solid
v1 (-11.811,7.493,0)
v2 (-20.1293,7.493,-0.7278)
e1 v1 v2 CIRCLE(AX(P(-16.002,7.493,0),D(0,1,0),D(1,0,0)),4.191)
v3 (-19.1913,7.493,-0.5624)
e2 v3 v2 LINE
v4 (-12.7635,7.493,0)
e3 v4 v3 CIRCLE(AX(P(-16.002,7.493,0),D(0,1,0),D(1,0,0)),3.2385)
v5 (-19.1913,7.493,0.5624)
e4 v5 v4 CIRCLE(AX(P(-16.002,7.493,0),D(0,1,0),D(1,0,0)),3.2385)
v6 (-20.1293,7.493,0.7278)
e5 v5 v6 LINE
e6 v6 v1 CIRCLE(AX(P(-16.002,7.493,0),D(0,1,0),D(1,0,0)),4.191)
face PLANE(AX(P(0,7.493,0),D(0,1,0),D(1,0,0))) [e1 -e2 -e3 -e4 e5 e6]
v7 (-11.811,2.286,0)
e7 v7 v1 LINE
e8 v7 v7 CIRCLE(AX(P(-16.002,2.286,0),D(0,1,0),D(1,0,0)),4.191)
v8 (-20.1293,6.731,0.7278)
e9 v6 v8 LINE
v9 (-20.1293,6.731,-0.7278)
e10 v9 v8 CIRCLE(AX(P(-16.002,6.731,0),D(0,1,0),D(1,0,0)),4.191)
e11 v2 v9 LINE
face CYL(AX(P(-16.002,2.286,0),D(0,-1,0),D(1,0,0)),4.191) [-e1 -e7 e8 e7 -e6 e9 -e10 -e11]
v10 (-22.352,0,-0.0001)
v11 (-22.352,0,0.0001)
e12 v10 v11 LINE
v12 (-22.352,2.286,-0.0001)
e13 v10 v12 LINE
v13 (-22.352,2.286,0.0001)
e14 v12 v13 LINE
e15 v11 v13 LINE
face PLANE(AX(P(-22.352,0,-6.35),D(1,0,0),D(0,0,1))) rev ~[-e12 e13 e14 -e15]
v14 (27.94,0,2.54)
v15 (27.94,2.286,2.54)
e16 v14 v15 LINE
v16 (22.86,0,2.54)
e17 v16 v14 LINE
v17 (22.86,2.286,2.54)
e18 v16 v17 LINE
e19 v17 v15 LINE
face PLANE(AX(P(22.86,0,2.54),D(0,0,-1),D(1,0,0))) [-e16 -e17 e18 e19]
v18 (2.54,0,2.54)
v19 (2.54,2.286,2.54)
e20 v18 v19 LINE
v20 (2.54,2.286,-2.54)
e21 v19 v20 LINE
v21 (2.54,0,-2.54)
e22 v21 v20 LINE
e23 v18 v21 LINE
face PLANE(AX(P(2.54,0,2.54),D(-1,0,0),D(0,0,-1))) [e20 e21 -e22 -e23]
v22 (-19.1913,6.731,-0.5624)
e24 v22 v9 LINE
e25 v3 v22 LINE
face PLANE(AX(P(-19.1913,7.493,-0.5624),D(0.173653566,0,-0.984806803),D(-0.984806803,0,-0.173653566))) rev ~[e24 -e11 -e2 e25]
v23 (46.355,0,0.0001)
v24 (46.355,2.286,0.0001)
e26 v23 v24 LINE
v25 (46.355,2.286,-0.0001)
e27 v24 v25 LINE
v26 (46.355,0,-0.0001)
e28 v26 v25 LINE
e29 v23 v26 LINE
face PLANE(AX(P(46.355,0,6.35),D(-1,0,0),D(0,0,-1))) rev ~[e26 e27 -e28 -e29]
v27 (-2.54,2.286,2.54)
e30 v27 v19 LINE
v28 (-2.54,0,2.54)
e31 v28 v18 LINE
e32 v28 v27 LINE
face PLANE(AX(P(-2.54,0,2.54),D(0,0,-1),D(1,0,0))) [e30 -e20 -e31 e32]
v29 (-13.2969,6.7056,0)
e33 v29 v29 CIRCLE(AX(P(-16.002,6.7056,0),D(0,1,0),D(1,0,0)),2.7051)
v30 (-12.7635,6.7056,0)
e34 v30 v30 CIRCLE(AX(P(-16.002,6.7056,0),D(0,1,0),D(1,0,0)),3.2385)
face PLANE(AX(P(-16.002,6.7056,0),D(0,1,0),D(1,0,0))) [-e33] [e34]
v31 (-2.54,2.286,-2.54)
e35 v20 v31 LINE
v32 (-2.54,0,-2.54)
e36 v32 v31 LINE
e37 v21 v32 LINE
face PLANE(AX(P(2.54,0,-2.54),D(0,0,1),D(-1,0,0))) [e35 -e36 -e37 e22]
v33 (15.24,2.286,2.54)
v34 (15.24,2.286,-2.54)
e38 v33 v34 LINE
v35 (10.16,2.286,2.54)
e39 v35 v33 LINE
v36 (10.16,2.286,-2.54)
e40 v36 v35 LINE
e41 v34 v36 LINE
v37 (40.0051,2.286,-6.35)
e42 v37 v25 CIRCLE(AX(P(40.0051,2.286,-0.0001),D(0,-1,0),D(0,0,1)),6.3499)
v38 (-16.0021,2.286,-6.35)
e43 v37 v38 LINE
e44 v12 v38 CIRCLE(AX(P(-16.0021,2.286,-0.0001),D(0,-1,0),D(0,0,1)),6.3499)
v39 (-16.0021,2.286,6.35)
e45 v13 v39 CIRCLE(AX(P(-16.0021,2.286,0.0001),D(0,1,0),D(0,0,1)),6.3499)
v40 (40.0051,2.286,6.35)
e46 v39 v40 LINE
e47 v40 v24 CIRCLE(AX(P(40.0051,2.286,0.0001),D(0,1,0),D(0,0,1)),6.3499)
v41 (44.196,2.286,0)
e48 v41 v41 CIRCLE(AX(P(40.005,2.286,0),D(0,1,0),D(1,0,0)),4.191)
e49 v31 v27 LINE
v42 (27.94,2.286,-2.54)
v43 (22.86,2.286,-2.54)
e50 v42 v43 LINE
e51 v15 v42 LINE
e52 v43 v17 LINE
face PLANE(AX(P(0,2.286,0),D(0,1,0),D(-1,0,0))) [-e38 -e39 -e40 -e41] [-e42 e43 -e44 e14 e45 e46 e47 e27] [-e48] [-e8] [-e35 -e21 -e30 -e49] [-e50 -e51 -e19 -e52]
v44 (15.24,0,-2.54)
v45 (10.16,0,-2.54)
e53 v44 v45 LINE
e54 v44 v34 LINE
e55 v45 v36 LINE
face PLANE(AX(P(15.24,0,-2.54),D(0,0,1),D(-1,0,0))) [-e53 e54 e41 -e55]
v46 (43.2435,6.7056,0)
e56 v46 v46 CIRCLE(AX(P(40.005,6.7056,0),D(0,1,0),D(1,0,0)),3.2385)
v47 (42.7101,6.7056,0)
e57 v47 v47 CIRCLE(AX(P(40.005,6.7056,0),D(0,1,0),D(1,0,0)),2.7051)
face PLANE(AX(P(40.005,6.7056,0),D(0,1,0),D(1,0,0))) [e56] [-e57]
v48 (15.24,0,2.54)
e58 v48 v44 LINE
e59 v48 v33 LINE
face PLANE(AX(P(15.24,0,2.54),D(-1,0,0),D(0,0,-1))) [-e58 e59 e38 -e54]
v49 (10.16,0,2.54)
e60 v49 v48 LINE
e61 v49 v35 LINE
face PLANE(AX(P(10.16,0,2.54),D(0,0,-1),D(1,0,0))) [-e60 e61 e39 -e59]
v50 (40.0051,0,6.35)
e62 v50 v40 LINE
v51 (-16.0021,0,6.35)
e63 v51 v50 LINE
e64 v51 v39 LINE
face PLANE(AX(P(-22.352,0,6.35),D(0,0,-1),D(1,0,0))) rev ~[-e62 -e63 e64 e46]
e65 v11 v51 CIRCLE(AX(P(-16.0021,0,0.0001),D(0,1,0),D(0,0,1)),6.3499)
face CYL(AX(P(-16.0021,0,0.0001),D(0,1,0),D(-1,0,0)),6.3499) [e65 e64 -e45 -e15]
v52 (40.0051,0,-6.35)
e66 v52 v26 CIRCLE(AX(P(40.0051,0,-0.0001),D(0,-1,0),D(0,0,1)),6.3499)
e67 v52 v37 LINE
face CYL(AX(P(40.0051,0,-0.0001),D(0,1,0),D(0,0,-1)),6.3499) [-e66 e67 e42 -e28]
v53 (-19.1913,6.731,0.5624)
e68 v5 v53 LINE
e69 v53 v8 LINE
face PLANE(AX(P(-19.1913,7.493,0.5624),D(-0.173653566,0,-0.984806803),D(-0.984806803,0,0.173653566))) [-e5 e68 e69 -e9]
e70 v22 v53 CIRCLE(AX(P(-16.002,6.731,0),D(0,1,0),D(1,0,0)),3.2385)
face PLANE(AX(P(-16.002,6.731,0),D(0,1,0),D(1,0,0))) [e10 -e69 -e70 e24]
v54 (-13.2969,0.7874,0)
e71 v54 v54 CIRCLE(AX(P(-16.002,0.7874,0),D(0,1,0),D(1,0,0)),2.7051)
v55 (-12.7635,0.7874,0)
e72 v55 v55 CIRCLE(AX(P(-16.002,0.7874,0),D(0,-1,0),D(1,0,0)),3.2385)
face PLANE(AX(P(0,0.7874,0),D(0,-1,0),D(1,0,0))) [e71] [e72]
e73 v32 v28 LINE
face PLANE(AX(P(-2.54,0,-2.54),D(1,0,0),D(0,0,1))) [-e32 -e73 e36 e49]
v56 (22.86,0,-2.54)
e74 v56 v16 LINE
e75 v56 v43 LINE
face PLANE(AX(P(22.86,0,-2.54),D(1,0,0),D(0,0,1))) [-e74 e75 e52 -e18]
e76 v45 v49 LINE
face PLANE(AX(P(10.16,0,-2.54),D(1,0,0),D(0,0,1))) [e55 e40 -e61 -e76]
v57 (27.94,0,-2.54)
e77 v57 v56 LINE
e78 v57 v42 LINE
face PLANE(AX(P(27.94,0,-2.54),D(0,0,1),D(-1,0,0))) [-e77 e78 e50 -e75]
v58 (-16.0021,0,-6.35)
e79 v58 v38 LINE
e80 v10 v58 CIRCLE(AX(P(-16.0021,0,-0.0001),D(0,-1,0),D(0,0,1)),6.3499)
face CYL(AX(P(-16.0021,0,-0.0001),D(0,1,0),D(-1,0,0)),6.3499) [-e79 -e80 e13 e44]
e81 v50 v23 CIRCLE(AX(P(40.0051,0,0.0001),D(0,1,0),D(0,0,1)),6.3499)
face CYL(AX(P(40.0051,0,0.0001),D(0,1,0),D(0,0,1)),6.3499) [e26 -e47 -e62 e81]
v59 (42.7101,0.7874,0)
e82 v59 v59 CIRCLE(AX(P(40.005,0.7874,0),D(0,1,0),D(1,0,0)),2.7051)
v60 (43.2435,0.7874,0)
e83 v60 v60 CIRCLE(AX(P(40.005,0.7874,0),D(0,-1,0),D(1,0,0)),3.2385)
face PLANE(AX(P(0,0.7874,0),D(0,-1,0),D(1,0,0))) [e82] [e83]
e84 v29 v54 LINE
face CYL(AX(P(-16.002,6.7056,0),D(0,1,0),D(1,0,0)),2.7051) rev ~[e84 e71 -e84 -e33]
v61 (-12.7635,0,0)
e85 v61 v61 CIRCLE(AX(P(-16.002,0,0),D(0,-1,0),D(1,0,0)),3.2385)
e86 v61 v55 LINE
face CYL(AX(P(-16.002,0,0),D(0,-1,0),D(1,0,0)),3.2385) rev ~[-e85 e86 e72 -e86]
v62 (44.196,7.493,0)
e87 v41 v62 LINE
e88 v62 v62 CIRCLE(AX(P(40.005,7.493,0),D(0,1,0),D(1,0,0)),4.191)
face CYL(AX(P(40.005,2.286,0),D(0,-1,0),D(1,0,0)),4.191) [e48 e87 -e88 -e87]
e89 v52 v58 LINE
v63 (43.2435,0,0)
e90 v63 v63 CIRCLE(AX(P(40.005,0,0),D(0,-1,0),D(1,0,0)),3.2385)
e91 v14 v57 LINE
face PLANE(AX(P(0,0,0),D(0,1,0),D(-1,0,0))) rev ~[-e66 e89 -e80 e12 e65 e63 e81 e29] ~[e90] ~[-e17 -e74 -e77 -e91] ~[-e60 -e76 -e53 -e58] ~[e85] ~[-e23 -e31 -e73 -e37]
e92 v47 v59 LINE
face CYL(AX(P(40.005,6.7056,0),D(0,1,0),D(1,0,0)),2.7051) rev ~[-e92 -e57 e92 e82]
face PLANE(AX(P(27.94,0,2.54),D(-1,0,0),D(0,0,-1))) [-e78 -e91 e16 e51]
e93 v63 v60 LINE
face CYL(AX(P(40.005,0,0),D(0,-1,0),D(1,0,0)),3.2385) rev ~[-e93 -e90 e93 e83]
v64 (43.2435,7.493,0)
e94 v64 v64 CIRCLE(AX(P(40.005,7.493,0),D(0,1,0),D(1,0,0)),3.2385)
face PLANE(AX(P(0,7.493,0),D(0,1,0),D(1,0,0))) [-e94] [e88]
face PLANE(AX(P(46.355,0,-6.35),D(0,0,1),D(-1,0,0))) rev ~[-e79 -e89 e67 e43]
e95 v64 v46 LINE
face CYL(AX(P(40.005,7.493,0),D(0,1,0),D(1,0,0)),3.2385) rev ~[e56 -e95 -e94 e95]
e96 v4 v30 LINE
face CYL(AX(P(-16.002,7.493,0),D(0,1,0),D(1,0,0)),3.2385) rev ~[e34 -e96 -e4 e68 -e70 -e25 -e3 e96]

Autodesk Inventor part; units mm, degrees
ref_plane "YZ Plane" through (0, 0, 0) normal (1, 0, 0) x (0, 1, 0)
ref_plane "XZ Plane" through (0, 0, 0) normal (0, 1, 0) x (-1, 0, 0)
ref_plane "XY Plane" through (0, 0, 0) normal (0, 0, 1) x (1, 0, 0)
sketch "Sketch1" plane through (0, 0, 0) normal (0, 1, 0) x (-1, 0, 0)
  line L0 (22.352, 6.35) -> (-46.355, 6.35)
  line L1 (-46.355, 6.35) -> (-46.355, -6.35)
  line L2 (-46.355, -6.35) -> (22.352, -6.35)
  line L3 (22.352, -6.35) -> (22.352, 6.35)
  line L4 (-2.54, -2.54) -> (2.54, -2.54)
  line L5 (2.54, -2.54) -> (2.54, 2.54)
  line L6 (2.54, 2.54) -> (-2.54, 2.54)
  line L7 (-2.54, 2.54) -> (-2.54, -2.54)
  line L8 (-2.54, -2.54) -> (2.54, 2.54) construction
  line L9 (2.54, -2.54) -> (-2.54, 2.54) construction
  line L10 (-10.16, 2.54) -> (-15.24, 2.54)
  line L11 (-15.24, 2.54) -> (-15.24, -2.54)
  line L12 (-15.24, -2.54) -> (-10.16, -2.54)
  line L13 (-10.16, -2.54) -> (-10.16, 2.54)
  line L14 (-10.16, 2.54) -> (-15.24, -2.54) construction
  line L15 (-15.24, 2.54) -> (-10.16, -2.54) construction
  line L16 (-22.86, 2.54) -> (-27.94, 2.54)
  line L17 (-27.94, 2.54) -> (-27.94, -2.54)
  line L18 (-27.94, -2.54) -> (-22.86, -2.54)
  line L19 (-22.86, -2.54) -> (-22.86, 2.54)
  line L20 (-22.86, 2.54) -> (-27.94, -2.54) construction
  line L21 (-27.94, 2.54) -> (-22.86, -2.54) construction
  point P0 (0, 0)
  point P1 (-12.7, 0)
  point P2 (-25.4, 0)
  dimension "d0" = 68.707
  dimension "d1" = 12.7
  dimension "d2" = 5.08
  dimension "d3" = 5.08
  dimension "d4" = 5.08
  dimension "d5" = 5.08
  dimension "d6" = 12.7
  dimension "d7" = 12.7
  dimension "d8" = 6.35
  dimension "d9" = 22.352
  dimension "d37" = 5.08
  dimension "d38" = 5.08
extrude "Extrusion1" add sketch "Sketch1" along normal blind 2.286
sketch "Sketch2" plane through (0, 2.286, 0) normal (0, 1, 0) x (1, 0, 0)
  line L0 (-22.352, 6.35) -> (-22.352, -6.35) projected
  circle A0 centre (-16.002, 0) radius 4.191
  point P0 (0, 0)
  dimension "d12" = 6.35
  dimension "d13" = 8.382
extrude "Extrusion2" add sketch "Sketch2" along normal blind 5.207
sketch "Sketch3" plane through (-16.002, 7.493, 0) normal (0, 1, 0) x (1, 0, 0)
  circle A0 centre (0, 0) radius 3.2385
  point P0 (16.002, 0)
  dimension "d16" = 6.477
extrude "Extrusion3" cut sketch "Sketch3" against normal blind 0.7874
sketch "Sketch4" plane through (0, 0, 0) normal (0, -1, 0) x (1, 0, 0)
  circle A0 centre (-16.002, 0) radius 3.2385 projected
  circle A1 centre (-16.002, 0) radius 3.2385
  point P0 (0, 0)
  dimension "d39" = 6.477
extrude "Extrusion4" cut sketch "Sketch4" against normal blind 0.7874
sketch "Sketch5" plane through (-16.002, 6.7056, 0) normal (0, 1, 0) x (1, 0, 0)
  circle A0 centre (0, 0) radius 2.7051
  point P0 (16.002, 0)
  dimension "d21" = 5.4102
extrude "Extrusion5" cut sketch "Sketch5" against normal through all
sketch "Sketch6" plane through (0, 2.286, 0) normal (0, 1, 0) x (1, 0, 0)
  line L0 (46.355, -6.35) -> (46.355, 6.35) projected
  circle A0 centre (40.005, 0) radius 4.191
  point P0 (0, 0)
  dimension "d24" = 6.35
  dimension "d25" = 8.382
extrude "Extrusion6" add sketch "Sketch6" along normal blind 5.207
sketch "Sketch7" plane through (40.005, 7.493, 0) normal (0, 1, 0) x (1, 0, 0)
  circle A0 centre (0, 0) radius 3.2385
  point P0 (-40.005, 0)
  dimension "d28" = 6.477
extrude "Extrusion7" cut sketch "Sketch7" against normal blind 0.7874
sketch "Sketch8" plane through (0, 0, 0) normal (0, -1, 0) x (1, 0, 0)
  circle A0 centre (40.005, 0) radius 3.2385 projected
  circle A1 centre (40.005, 0) radius 3.2385
  point P0 (0, 0)
  dimension "d40" = 6.477
extrude "Extrusion8" cut sketch "Sketch8" against normal blind 0.7874
sketch "Sketch9" plane through (40.005, 6.7056, 0) normal (0, 1, 0) x (1, 0, 0)
  circle A0 centre (0, 0) radius 2.7051
  point P0 (-40.005, 0)
  dimension "d33" = 5.4102
extrude "Extrusion9" cut sketch "Sketch9" against normal through all
fillet "Fillet1" radius 6.35 4 edges at (46.355, 1.143, 6.35) (46.355, 1.143, -6.35) (-22.352, 1.143, 6.35) (-22.352, 1.143, -6.35)
sketch "Sketch12" plane through (-16.002, 7.493, 0) normal (0, 1, 0) x (1, 0, 0)
  circle A0 centre (0, 0) radius 4.191 projected
  line L0 (0, 0) -> (4.0259, 0) construction
  line L1 (0, 0) -> (4.0259, 0) construction
  circle A1 centre (0, 0) radius 3.2385 projected
  line L2 (-3.1893, 0.5624) -> (-4.1273, 0.7278)
  line L3 (-3.1893, -0.5624) -> (-4.1273, -0.7278)
  arc A2 (-3.1893, 0.5624) -> (-3.1893, -0.5624) centre (0, 0) ccw
  arc A3 (-4.1273, 0.7278) -> (-4.1273, -0.7278) centre (0, 0) ccw
  point P0 (16.002, 0)
  point P1 (-2.9392, 0.5183)
extrude "Extrusion11" cut sketch "Sketch12" against normal blind 0.762 contours L2 A1 L3 A0 picked at (-3.8669, 0.0628)
properties part number "VexLegoMountThick3"
